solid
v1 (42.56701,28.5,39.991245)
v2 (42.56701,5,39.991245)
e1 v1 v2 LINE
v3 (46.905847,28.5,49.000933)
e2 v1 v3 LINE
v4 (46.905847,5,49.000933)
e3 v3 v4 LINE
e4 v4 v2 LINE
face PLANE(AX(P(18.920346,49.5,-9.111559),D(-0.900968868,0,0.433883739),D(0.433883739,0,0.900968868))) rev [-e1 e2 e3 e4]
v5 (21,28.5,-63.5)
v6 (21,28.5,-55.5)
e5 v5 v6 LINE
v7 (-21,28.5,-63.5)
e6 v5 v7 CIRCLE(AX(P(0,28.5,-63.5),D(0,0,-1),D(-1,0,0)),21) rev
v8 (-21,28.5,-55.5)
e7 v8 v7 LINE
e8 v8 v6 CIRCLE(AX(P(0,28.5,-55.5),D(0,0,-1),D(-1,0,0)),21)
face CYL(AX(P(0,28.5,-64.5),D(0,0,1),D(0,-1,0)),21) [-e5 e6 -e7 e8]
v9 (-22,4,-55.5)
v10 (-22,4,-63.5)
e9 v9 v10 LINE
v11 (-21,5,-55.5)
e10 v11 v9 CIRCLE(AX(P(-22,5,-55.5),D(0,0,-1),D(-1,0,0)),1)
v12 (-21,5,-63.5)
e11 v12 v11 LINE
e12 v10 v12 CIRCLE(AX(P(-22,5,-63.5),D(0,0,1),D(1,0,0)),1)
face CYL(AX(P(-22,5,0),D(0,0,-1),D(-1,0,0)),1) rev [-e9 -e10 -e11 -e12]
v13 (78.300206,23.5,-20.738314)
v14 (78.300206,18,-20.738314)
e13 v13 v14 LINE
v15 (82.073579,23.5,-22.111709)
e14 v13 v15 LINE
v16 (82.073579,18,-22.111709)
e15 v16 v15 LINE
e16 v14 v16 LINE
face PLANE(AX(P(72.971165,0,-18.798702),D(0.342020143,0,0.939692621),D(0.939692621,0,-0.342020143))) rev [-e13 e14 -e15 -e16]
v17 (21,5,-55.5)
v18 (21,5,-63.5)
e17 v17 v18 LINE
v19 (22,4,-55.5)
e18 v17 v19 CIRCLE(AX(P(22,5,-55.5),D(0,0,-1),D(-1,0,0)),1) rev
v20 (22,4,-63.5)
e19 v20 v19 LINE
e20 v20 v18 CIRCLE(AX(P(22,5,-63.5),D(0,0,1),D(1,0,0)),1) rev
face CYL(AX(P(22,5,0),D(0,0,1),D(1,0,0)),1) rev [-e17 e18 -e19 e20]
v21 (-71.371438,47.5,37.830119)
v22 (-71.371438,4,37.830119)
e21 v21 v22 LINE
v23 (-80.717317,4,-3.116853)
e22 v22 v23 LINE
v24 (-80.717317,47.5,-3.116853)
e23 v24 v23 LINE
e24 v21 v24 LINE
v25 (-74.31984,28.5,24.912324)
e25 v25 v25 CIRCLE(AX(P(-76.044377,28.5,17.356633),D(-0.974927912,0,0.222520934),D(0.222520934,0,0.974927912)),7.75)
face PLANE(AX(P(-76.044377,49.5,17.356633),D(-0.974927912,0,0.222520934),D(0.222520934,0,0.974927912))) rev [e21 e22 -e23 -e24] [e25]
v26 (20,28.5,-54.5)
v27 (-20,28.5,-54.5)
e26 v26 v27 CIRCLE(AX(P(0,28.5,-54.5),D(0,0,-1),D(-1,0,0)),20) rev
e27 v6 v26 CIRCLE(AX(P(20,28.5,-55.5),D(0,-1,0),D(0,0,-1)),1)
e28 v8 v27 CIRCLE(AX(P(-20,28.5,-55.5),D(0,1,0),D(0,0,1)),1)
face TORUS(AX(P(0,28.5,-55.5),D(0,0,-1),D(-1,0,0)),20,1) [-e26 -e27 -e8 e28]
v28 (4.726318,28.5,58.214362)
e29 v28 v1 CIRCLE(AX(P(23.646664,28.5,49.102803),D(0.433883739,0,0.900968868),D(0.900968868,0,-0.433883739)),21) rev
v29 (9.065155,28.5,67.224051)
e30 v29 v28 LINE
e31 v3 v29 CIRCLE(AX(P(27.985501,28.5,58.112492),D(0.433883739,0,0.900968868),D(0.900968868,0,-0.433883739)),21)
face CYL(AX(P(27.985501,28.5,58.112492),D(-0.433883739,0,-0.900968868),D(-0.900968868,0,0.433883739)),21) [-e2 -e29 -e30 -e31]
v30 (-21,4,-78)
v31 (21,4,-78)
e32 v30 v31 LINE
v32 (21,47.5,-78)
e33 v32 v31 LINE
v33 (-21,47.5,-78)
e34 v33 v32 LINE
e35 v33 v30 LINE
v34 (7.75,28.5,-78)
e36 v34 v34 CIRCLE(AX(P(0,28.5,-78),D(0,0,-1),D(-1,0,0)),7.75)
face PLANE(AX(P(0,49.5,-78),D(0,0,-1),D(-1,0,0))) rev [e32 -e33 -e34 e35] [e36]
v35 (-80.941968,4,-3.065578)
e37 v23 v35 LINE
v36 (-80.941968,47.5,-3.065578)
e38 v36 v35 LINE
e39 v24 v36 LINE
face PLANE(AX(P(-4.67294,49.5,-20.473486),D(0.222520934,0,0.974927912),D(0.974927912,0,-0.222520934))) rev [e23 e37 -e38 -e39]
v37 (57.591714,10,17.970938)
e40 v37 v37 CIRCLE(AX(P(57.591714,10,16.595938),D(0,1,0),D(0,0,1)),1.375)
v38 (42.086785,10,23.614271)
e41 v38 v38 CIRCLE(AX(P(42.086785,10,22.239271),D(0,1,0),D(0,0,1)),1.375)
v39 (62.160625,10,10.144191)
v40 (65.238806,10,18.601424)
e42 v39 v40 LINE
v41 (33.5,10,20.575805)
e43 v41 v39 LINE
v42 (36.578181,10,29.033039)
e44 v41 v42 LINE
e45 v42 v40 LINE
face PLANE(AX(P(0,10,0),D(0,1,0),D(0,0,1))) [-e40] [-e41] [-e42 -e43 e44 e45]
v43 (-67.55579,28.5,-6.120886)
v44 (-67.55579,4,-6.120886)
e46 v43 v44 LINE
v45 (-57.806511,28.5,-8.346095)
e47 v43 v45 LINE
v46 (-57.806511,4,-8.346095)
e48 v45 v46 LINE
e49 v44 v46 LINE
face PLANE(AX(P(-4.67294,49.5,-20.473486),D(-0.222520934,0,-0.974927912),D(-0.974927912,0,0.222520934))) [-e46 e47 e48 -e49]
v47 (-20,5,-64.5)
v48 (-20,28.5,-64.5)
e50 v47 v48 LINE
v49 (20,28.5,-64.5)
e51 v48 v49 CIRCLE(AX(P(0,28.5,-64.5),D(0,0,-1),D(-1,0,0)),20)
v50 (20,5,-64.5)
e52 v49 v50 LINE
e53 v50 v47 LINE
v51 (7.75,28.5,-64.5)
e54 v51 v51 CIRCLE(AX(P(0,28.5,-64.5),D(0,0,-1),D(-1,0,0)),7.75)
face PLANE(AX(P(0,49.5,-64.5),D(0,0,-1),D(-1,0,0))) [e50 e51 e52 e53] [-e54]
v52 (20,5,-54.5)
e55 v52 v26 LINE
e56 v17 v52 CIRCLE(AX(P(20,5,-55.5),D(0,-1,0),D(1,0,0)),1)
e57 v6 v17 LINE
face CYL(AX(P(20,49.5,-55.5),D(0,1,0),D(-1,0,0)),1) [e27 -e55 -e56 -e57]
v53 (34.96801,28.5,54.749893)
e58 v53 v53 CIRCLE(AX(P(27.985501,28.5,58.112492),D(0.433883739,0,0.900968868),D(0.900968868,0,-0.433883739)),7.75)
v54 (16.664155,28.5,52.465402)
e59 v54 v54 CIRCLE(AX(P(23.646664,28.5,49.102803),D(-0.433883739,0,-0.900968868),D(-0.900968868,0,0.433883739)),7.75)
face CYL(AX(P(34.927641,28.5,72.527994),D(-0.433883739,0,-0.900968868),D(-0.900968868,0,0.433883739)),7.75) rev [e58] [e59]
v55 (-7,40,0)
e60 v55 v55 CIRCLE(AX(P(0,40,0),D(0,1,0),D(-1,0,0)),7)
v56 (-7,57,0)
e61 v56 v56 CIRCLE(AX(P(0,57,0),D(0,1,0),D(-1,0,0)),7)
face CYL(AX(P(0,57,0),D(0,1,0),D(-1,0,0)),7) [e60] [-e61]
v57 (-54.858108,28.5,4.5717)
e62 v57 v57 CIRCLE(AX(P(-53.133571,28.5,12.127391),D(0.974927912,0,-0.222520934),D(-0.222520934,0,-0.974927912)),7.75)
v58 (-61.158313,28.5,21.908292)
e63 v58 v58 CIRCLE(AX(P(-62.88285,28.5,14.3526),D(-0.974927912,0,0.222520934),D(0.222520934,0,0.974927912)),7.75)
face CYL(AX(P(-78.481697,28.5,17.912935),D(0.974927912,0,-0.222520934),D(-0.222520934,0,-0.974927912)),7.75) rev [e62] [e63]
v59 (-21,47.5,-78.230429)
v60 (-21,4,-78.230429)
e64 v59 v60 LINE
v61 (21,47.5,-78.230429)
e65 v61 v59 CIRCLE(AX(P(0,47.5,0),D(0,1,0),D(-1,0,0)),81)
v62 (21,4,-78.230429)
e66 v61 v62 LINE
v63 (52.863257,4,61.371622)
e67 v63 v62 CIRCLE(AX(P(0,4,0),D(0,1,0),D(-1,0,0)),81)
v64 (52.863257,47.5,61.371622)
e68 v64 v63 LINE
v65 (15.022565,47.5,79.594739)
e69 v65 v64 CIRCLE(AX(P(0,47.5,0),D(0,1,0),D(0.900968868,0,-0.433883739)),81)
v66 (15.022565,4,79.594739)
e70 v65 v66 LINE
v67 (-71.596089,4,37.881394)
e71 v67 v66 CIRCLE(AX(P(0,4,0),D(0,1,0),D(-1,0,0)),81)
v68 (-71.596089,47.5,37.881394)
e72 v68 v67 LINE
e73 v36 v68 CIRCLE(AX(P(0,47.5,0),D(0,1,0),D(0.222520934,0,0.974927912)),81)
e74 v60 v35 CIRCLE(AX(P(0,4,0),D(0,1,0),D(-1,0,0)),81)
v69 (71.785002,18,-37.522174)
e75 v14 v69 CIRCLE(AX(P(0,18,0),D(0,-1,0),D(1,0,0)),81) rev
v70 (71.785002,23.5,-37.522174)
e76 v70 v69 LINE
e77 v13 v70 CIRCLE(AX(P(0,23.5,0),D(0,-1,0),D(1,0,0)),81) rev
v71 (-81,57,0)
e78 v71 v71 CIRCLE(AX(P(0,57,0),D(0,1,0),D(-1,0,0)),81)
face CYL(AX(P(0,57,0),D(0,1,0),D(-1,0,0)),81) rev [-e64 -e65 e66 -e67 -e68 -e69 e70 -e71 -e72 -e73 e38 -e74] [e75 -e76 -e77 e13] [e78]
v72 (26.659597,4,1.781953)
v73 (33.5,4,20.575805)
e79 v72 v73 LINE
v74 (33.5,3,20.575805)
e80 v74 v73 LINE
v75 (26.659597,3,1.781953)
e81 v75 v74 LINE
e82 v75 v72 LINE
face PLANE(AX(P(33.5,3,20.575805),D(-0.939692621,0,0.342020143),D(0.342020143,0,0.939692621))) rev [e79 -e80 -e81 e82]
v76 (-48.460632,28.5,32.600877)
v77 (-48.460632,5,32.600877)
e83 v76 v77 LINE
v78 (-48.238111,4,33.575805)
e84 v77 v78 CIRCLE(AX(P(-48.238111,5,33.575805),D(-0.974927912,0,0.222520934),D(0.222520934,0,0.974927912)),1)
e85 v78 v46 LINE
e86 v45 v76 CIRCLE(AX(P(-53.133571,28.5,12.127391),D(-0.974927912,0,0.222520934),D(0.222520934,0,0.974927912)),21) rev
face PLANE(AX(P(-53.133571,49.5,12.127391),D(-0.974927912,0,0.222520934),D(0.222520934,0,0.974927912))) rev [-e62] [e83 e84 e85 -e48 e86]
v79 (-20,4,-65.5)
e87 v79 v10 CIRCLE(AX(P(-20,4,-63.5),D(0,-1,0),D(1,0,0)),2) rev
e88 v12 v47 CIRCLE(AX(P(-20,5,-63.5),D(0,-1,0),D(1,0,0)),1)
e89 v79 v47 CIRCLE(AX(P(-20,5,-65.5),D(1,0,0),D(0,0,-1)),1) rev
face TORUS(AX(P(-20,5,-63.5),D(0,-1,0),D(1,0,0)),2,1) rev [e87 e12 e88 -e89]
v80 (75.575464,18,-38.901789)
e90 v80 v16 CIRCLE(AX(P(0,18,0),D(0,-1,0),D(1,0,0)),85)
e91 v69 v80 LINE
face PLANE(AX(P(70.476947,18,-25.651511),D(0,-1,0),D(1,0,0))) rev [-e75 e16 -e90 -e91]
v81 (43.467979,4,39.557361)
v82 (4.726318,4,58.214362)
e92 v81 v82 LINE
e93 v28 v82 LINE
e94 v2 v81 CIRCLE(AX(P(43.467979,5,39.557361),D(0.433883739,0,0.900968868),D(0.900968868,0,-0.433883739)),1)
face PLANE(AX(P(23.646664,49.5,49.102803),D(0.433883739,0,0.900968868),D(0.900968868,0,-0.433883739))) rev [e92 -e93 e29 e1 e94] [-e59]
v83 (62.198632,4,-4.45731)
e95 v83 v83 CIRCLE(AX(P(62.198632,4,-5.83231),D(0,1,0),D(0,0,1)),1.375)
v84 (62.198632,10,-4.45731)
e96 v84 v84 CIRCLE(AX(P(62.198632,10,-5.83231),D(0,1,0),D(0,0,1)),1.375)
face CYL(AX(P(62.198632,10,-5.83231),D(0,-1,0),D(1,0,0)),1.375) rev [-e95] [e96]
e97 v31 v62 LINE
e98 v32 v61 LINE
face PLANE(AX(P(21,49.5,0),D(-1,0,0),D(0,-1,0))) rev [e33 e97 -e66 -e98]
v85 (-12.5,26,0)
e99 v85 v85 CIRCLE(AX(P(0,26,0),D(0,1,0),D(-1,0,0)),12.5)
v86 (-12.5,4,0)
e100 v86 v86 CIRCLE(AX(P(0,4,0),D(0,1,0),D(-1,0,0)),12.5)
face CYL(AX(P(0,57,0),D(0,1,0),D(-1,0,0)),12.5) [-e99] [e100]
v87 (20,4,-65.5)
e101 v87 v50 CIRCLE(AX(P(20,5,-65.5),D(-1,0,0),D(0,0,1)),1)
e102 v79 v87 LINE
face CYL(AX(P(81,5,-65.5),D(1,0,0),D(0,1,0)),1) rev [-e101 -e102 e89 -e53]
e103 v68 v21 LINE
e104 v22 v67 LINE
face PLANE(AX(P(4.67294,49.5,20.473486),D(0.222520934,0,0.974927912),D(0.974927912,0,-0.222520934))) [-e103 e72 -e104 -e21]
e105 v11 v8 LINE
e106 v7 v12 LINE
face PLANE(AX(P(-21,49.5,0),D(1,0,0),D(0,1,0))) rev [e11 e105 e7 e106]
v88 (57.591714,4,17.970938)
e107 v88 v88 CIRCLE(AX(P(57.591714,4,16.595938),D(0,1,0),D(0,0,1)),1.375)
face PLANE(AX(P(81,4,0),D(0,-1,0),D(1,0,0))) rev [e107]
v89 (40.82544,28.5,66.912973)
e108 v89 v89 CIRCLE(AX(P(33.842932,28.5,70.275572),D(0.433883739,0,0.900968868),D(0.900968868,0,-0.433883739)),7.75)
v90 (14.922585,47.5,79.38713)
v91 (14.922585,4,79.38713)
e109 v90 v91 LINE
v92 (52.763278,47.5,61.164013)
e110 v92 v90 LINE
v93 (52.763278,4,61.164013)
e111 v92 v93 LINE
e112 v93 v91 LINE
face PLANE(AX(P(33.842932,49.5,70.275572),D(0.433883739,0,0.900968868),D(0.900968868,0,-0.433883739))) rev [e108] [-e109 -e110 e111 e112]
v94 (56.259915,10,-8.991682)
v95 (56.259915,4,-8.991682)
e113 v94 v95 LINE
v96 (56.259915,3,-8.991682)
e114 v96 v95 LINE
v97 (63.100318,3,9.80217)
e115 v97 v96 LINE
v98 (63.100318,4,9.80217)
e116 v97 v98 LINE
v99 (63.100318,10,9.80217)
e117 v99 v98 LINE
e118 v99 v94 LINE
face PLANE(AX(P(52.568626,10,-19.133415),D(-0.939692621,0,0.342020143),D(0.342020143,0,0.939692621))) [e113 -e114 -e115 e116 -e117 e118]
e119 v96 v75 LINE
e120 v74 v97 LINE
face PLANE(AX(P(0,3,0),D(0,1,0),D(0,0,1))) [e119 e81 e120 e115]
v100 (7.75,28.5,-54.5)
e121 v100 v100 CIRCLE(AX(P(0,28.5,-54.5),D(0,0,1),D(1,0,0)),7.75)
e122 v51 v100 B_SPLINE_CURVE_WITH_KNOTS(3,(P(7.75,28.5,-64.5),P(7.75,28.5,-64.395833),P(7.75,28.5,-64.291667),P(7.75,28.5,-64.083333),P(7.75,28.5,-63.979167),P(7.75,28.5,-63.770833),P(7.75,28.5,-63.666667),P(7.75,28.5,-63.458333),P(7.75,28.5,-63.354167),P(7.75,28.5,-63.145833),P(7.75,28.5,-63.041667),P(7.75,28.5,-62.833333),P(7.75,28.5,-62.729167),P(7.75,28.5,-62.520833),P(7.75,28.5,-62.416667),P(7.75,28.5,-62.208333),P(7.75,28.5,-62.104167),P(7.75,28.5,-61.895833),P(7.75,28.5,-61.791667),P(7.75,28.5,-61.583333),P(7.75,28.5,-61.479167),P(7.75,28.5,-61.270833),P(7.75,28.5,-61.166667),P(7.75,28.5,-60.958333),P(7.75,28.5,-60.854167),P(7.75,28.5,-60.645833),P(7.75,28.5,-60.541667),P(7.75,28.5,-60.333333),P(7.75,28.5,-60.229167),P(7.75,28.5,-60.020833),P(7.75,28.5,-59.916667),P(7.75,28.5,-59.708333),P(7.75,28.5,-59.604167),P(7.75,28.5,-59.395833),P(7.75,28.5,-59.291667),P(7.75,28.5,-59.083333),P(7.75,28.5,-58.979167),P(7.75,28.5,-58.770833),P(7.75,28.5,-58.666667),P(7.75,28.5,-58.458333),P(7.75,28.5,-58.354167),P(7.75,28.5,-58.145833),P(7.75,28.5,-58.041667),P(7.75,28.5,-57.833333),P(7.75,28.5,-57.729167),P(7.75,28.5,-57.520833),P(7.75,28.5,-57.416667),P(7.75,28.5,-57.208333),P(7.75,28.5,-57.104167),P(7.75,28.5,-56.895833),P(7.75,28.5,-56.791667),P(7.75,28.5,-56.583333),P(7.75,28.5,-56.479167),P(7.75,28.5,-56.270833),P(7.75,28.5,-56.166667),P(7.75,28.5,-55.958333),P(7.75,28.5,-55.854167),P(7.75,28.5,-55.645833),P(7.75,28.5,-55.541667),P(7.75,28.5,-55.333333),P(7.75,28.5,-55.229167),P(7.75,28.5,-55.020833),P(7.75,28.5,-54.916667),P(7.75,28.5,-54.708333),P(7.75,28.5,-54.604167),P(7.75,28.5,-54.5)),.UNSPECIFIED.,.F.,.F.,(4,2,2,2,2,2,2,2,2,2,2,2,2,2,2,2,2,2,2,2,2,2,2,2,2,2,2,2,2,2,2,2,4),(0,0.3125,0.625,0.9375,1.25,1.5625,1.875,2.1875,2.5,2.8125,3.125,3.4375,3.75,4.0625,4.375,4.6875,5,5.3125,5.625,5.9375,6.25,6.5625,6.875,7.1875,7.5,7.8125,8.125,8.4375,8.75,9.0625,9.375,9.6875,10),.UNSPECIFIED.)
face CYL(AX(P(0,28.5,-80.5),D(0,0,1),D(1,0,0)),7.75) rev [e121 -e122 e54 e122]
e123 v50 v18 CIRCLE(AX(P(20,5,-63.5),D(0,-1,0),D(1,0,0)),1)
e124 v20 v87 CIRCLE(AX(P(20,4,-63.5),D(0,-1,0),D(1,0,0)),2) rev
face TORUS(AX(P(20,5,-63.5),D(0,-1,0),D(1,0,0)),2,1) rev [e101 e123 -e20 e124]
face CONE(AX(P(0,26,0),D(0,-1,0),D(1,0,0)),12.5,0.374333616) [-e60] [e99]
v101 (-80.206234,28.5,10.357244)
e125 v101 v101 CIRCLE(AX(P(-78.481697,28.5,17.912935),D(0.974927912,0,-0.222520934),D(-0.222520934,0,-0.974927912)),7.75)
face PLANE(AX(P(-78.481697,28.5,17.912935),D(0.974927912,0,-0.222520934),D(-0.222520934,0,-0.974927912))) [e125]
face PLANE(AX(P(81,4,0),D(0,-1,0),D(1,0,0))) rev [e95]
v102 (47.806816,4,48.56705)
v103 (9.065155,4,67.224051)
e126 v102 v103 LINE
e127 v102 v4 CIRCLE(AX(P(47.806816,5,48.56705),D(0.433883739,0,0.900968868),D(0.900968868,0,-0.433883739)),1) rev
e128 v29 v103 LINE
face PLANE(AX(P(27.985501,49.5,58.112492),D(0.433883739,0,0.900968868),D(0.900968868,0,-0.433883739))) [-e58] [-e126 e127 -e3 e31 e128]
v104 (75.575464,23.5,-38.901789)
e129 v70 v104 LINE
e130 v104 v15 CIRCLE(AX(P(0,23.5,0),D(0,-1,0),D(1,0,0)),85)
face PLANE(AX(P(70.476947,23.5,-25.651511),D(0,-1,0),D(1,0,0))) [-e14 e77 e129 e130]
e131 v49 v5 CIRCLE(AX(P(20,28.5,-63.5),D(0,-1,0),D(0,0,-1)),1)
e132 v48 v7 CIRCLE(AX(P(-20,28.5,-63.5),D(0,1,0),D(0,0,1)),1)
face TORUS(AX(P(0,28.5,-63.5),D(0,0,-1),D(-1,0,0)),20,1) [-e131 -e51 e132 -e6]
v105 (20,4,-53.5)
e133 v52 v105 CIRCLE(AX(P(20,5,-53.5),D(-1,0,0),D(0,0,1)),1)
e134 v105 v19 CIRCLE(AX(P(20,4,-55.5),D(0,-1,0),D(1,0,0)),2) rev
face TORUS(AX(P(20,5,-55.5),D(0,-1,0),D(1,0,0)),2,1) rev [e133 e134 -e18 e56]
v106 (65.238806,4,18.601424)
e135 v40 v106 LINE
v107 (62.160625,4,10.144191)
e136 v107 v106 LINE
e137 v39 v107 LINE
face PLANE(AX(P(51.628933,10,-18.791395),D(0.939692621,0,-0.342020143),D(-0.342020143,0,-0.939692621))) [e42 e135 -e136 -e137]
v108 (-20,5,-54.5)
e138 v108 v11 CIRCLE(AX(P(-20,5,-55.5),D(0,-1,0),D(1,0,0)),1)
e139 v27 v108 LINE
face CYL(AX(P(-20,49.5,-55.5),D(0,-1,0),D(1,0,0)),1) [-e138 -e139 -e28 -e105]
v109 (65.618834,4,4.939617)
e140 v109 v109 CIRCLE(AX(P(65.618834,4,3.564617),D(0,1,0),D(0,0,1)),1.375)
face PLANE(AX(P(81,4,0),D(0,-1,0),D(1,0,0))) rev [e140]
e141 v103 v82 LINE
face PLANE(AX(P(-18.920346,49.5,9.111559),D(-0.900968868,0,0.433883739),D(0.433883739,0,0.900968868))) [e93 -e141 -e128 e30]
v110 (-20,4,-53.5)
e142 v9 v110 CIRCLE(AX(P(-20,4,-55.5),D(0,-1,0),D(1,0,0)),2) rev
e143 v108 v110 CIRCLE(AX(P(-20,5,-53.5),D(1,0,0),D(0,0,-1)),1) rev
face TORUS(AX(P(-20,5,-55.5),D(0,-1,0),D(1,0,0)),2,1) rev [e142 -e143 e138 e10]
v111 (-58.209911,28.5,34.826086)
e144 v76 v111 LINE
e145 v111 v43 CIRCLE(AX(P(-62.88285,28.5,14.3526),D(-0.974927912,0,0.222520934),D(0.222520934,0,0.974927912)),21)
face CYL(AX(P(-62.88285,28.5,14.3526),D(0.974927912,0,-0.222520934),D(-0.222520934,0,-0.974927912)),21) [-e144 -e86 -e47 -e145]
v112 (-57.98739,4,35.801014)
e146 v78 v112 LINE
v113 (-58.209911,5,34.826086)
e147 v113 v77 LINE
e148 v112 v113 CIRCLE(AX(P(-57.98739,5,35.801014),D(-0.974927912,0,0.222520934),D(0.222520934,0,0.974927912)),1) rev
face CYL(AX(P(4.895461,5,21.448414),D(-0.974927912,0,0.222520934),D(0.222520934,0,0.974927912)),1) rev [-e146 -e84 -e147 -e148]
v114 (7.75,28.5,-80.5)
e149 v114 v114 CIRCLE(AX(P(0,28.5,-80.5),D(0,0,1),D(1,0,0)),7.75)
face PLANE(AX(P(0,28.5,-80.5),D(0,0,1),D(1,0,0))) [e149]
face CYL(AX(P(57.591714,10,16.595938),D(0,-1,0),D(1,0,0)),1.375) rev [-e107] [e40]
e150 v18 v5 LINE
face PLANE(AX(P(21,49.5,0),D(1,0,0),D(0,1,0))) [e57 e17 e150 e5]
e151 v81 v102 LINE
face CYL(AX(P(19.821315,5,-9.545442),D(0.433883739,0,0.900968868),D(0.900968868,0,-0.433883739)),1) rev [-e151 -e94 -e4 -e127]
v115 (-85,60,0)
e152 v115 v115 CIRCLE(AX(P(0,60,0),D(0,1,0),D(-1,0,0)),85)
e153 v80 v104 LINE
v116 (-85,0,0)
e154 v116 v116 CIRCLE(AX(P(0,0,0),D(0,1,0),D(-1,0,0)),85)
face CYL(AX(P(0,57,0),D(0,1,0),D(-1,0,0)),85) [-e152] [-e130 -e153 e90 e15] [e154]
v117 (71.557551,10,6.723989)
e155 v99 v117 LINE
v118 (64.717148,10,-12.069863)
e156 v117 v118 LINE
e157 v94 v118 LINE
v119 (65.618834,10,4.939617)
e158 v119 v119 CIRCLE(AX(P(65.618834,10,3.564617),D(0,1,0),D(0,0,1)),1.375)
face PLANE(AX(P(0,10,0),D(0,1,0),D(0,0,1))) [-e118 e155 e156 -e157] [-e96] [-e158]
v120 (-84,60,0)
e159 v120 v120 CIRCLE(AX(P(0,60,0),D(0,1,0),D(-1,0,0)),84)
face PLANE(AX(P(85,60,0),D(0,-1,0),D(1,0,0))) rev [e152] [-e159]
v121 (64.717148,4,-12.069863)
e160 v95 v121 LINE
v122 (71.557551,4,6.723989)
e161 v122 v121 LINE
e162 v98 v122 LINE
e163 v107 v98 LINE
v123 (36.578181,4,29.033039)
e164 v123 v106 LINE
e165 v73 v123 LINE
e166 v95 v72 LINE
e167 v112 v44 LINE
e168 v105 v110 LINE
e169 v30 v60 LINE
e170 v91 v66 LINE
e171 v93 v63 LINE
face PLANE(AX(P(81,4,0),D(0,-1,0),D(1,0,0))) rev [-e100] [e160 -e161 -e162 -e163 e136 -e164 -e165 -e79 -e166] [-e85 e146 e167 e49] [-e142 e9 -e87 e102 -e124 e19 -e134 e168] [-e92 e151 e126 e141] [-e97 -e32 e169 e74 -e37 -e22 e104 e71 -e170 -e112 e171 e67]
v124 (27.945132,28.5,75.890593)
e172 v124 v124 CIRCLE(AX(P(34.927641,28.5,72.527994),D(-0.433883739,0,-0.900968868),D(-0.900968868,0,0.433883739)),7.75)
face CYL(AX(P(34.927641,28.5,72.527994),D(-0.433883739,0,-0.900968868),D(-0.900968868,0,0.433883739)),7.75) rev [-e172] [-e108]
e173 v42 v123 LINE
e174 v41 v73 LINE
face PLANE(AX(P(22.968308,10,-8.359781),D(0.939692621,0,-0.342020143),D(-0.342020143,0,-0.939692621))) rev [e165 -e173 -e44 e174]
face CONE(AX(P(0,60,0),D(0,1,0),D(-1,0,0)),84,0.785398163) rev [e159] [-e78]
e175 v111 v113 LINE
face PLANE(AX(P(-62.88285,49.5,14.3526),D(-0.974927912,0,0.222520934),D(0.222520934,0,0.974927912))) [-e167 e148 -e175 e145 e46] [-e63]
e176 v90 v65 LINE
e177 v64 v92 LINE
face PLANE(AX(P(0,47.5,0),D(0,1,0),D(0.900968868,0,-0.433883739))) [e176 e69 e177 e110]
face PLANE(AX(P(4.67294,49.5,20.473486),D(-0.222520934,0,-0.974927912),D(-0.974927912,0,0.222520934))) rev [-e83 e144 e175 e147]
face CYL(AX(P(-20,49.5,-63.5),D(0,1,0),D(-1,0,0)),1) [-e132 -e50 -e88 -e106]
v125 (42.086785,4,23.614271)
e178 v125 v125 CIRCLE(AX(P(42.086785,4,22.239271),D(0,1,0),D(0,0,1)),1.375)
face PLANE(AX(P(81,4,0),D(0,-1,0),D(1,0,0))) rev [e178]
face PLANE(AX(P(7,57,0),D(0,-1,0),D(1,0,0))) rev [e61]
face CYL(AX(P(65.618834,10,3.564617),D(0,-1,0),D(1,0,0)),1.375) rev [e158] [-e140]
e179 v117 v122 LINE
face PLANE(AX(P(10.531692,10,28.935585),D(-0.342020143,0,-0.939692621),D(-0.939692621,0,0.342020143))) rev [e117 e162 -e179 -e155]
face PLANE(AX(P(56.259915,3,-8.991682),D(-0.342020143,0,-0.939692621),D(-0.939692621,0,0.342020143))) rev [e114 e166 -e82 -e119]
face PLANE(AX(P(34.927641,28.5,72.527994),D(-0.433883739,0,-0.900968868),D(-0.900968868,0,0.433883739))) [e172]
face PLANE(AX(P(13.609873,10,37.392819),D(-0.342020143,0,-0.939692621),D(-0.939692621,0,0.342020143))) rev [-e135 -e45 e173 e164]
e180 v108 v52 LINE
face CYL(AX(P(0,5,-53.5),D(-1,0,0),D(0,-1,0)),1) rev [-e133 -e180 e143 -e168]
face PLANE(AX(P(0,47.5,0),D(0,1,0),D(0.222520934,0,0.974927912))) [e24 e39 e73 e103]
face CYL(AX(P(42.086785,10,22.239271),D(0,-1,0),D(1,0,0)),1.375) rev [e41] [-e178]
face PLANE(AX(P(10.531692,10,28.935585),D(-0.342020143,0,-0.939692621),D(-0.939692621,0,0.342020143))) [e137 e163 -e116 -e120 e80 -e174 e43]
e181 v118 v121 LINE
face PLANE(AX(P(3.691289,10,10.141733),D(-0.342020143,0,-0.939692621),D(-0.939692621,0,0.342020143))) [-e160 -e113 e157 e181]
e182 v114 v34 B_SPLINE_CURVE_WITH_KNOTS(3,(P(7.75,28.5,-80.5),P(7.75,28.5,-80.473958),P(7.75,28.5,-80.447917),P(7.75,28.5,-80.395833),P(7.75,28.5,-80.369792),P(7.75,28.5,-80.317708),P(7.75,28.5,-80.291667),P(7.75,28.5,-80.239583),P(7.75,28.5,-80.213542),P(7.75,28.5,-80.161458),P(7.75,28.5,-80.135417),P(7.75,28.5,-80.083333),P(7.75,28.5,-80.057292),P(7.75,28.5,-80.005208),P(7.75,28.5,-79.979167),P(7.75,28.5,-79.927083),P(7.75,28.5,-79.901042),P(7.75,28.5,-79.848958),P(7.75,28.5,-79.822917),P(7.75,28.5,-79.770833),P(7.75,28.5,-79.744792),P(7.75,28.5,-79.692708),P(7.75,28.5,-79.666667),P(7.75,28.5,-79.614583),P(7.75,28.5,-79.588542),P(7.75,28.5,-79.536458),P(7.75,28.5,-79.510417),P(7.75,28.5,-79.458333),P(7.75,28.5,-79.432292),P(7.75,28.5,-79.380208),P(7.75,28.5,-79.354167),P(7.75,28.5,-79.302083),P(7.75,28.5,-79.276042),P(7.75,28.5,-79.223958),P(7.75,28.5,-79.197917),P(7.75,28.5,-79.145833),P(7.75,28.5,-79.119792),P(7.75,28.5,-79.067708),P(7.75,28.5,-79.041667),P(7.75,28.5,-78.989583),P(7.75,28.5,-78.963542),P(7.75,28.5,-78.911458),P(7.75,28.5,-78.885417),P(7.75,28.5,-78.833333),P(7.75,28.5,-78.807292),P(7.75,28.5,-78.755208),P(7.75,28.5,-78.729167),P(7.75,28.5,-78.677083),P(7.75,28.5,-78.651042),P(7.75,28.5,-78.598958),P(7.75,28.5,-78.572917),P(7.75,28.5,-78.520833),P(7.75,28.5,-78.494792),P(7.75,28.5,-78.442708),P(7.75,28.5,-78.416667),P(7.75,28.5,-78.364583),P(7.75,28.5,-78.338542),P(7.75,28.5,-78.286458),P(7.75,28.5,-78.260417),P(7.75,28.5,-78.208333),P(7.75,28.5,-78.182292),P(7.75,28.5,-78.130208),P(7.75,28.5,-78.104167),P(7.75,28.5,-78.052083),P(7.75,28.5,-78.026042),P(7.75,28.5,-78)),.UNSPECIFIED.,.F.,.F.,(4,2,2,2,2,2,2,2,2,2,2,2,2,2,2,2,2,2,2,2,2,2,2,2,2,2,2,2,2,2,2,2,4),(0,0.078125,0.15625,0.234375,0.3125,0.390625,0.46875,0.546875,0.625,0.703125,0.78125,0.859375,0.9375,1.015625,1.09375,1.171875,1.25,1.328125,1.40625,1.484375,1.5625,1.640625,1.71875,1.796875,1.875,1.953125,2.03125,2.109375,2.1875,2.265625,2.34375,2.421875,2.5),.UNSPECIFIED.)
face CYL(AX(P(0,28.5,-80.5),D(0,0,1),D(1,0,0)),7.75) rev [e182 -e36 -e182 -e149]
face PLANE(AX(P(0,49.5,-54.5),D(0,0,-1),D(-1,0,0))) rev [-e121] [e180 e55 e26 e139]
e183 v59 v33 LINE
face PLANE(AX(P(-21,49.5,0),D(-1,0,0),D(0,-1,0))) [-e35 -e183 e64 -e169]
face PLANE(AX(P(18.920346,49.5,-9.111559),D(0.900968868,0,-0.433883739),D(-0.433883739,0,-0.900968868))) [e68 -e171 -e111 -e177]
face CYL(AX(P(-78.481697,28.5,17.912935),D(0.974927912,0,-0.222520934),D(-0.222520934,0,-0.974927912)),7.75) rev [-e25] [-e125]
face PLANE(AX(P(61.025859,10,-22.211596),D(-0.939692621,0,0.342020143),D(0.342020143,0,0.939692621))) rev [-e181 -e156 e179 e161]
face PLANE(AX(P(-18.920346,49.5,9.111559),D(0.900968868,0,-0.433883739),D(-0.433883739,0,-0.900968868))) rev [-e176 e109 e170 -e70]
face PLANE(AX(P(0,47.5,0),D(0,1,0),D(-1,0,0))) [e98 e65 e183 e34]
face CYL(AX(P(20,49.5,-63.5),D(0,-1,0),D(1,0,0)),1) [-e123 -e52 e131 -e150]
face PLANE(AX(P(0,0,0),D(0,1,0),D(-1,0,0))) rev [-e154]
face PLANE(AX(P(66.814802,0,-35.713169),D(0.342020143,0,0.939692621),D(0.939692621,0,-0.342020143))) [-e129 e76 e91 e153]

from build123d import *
from build123d.topology import SkipClean

# Parameters (mm, degrees)
SKETCH2_W               = 42
SKETCH2_H               = 10
BOSS_EXTRUDE1_DEPTH     = 45.5
FILLET1_RADIUS          = 21
FILLET1_LENGTH          = 10
SKETCH6_R               = 7.75
CUT_EXTRUDE2_DEPTH      = 26
FILLET2_R               = 1
CIRPATTERN4_START       = 54.5
CIRPATTERN4_OUTLINE_R   = 7.75
CIRPATTERN4_DEPTH       = 10
CIRPATTERN4_START_2     = 78
CIRPATTERN4_2_OUTLINE_W = 42
CIRPATTERN4_2_OUTLINE_H = 45.5
CIRPATTERN4_2_OUTLINE_R = 7.75
CIRPATTERN4_2_DEPTH     = 3
CIRPATTERN4_START_3     = 80.5
CIRPATTERN4_3_OUTLINE_R = 7.75
CIRPATTERN4_3_DEPTH     = 0.5
CIRPATTERN4_START_4     = -64.5
CIRPATTERN4_4_OUTLINE_R = 7.75
CIRPATTERN4_4_DEPTH     = 10
CIRPATTERN4_START_5     = -81.0000001
CIRPATTERN4_5_OUTLINE_W = 45.5
CIRPATTERN4_5_OUTLINE_H = 42
CIRPATTERN4_5_OUTLINE_R = 7.75
CIRPATTERN4_5_DEPTH     = 3.0000001
CIRPATTERN4_6_OUTLINE_R = 7.75
CIRPATTERN4_6_DEPTH     = 0.5000001
CUT_EXTRUDE3_START      = -2
CUT_EXTRUDE3_DEPTH      = 2
CIRPATTERN5_COUNT       = 7
SKETCH8_R               = 1.375
BOSS_EXTRUDE5_DEPTH     = 6
CUT_EXTRUDE4_DEPTH      = 1
SKETCH10_W              = 18
SKETCH10_H              = 5.5
CUT_EXTRUDE5_DEPTH      = 10


# Read off the part's stored shape, not the designer's step: CirPattern4
with BuildPart() as part:
    # Sketch1 → Revolve1 (revolve)
    with BuildSketch(Plane.XY, mode=Mode.PRIVATE) as revolve1_sk:
        Polygon((0, 0), (85, 0), (85, 60), (84, 60), (81, 57), (81, 4), (12.5, 4), (12.5, 26), (7, 40), (7, 57), (0, 57), align=None)
    revolve(revolve1_sk.sketch.rotate(Axis((0, 57, 0), (0, -1, 0)), 180), axis=Axis((0, 57, 0), (0, -1, 0)))

    # Sketch2 → Boss-Extrude1 (add)
    with BuildSketch(Plane(origin=(0, 4, 0), x_dir=(1, 0, 0), z_dir=(0, 1, 0))):
        with BuildLine():
            Line((-21, 78.230428862), (-21, 78))
            Line((-21, 78), (21, 78))
            Line((21, 78), (21, 78.230428862))
            ThreePointArc((21, 78.230428862), (0, 81), (-21, 78.230428862))
        make_face()
        with Locations((0, 59.5)):
            Rectangle(SKETCH2_W, SKETCH2_H)
    extrude(amount=BOSS_EXTRUDE1_DEPTH)

    # Fillet1: full round fillet: the end face becomes a half cylinder, R = half its width
    fillet1_face = Plane((0, 49.5, -59.5), x_dir=(0, 0, -1), z_dir=(0, 1, 0))  # on the end face: x along it, z out of the body
    fillet1_slab = fillet1_face.offset(-FILLET1_RADIUS / 2) * Box(FILLET1_LENGTH, 2 * FILLET1_RADIUS, FILLET1_RADIUS, mode=Mode.PRIVATE)  # the body's end, R deep
    fillet1_round = Plane((0, 28.5, -59.5), x_dir=(0, 1, 0), z_dir=(0, 0, -1)) * Cylinder(FILLET1_RADIUS, FILLET1_LENGTH, mode=Mode.PRIVATE)  # its axis R under the face
    add(fillet1_slab - fillet1_round, mode=Mode.SUBTRACT)

    # Sketch6 → Cut-Extrude2 (cut)
    with BuildSketch(Plane.XY.offset(-54.5)):
        with Locations((0, 28.5)):
            Circle(SKETCH6_R)
    extrude(amount=-CUT_EXTRUDE2_DEPTH, mode=Mode.SUBTRACT)

    # Fillet2
    fillet2_edges = [part.edges().sort_by_distance(p)[0] for p in [
        (-21, 4, -59.5),
        (0, 4, -54.5),
        (21, 4, -59.5),
        (0, 4, -64.5),
        (21, 16.25, -64.5),
        (21, 16.25, -54.5),
        (-21, 16.25, -54.5),
        (-21, 16.25, -64.5),
        (0, 49.5, -64.5),
        (0, 49.5, -54.5),
    ]]
    fillet(fillet2_edges, radius=FILLET2_R)

    # CirPattern4 outline → CirPattern4 (add)
    with BuildSketch(Plane(origin=(0, 0, 0), x_dir=(0.9009688679024158, 0, -0.433883739117565), z_dir=(0.43388373911756495, 0, 0.9009688679024159)).offset(CIRPATTERN4_START)):
        with BuildLine():
            Line((-21, 28.5), (-21, 4))
            Line((-21, 4), (22, 4))
            ThreePointArc((22, 4), (21.292893219, 4.292893219), (21, 5))
            Line((21, 5), (21, 28.5))
            ThreePointArc((21, 28.5), (0, 49.5), (-21, 28.5))
        make_face()
        with Locations((0, 28.5)):
            Circle(CIRPATTERN4_OUTLINE_R, mode=Mode.SUBTRACT)
    extrude(amount=CIRPATTERN4_DEPTH)

    # CirPattern4 2 outline → CirPattern4 2 (add)
    with BuildSketch(Plane(origin=(0, 0, 0), x_dir=(0.9009688679024158, 0, -0.433883739117565), z_dir=(0.43388373911756495, 0, 0.9009688679024159)).offset(CIRPATTERN4_START_2)):
        with Locations((0, 26.75)):
            Rectangle(CIRPATTERN4_2_OUTLINE_W, CIRPATTERN4_2_OUTLINE_H)
        with Locations((0, 28.5)):
            Circle(CIRPATTERN4_2_OUTLINE_R, mode=Mode.SUBTRACT)
    extrude(amount=CIRPATTERN4_2_DEPTH)

    # CirPattern4 3 outline → CirPattern4 3 (add)
    with BuildSketch(Plane(origin=(0, 0, 0), x_dir=(0.9009688679024158, 0, -0.433883739117565), z_dir=(0.43388373911756495, 0, 0.9009688679024159)).offset(CIRPATTERN4_START_3)):
        with Locations((0, 28.5)):
            Circle(CIRPATTERN4_3_OUTLINE_R)
    extrude(amount=CIRPATTERN4_3_DEPTH)

    # CirPattern4 4 outline → CirPattern4 4 (add)
    with BuildSketch(Plane(origin=(0, 0, 0), x_dir=(0, 1, 0), z_dir=(0.9749279121818228, 0, -0.22252093395631797)).offset(CIRPATTERN4_START_4)):
        with BuildLine():
            Line((4, -21), (28.5, -21))
            ThreePointArc((28.5, -21), (49.5, 0), (28.5, 21))
            Line((28.5, 21), (5, 21))
            ThreePointArc((5, 21), (4.292893219, 21.292893219), (4, 22))
            Line((4, 22), (4, -21))
        make_face()
        with Locations((28.5, 0)):
            Circle(CIRPATTERN4_4_OUTLINE_R, mode=Mode.SUBTRACT)
    extrude(amount=CIRPATTERN4_4_DEPTH)

    # CirPattern4 5 outline → CirPattern4 5 (add)
    with BuildSketch(Plane(origin=(0, 0, 0), x_dir=(0, 1, 0), z_dir=(0.9749279121818228, 0, -0.22252093395631797)).offset(CIRPATTERN4_START_5)):
        with Locations((26.75, 0)):
            Rectangle(CIRPATTERN4_5_OUTLINE_W, CIRPATTERN4_5_OUTLINE_H)
        with Locations((28.5, 0)):
            Circle(CIRPATTERN4_5_OUTLINE_R, mode=Mode.SUBTRACT)
    extrude(amount=CIRPATTERN4_5_DEPTH)

    # CirPattern4 6 outline → CirPattern4 6 (add)
    with BuildSketch(Plane(origin=(0, 0, 0), x_dir=(0, 1, 0), z_dir=(0.9749279121818228, 0, -0.22252093395631797)).offset(CIRPATTERN4_START_5)):
        with Locations((28.5, 0)):
            Circle(CIRPATTERN4_6_OUTLINE_R)
    extrude(amount=CIRPATTERN4_6_DEPTH)

    # Sketch7 → Cut-Extrude3 (cut)
    with SkipClean():  # the faces are left unmerged after this step: merging them gives an invalid solid
        with BuildSketch(Plane(origin=(0, 49.5, 0), x_dir=(1, 0, 0), z_dir=(0, 1, 0)).offset(CUT_EXTRUDE3_START)):
            with BuildLine():
                Line((-21, 78), (21, 78))
                Line((21, 78), (21, 78.230428862))
                ThreePointArc((21, 78.230428862), (0, 81), (-21, 78.230428862))
                Line((-21, 78.230428862), (-21, 78))
            make_face()
        cut_extrude3 = extrude(amount=CUT_EXTRUDE3_DEPTH, mode=Mode.SUBTRACT)

    # CirPattern5: Cut-Extrude3 ×7 about axis, 4 skipped
    with SkipClean():  # the faces are left unmerged after this step: merging them gives an invalid solid
        cirpattern5_axis = Axis((0, 0, 0), (0, 1, 0))
        add([cut_extrude3.rotate(cirpattern5_axis, i * 360 / CIRPATTERN5_COUNT) for i in range(1, CIRPATTERN5_COUNT) if i not in (1, 3, 5, 6)], mode=Mode.SUBTRACT)

    # Sketch8 → Boss-Extrude5 (add)
    # profile 1 of 2: a face of its own
    with SkipClean():  # the faces are left unmerged after this step: merging them gives an invalid solid
        with BuildSketch(Plane(origin=(0, 4, 0), x_dir=(1, 0, 0), z_dir=(0, 1, 0))):
            Polygon((62.160624934, -10.144190597), (33.5, -20.575804969), (36.57818129, -29.033038556), (65.238806224, -18.601424184), align=None)
            with Locations(Location((42.086785301, -22.239270687, 0), (0, 0, 270))):
                Circle(SKETCH8_R, mode=Mode.SUBTRACT)
            with Locations(Location((57.591713544, -16.595938322, 0), (0, 0, 270))):
                Circle(SKETCH8_R, mode=Mode.SUBTRACT)
        # profile 2 of 2: a face of its own
        with BuildSketch(Plane(origin=(0, 4, 0), x_dir=(1, 0, 0), z_dir=(0, 1, 0))):
            Polygon((63.100317555, -9.802170454), (71.557551142, -6.723989164), (64.717148275, 12.069863252), (56.259914688, 8.991681962), align=None)
            with Locations(Location((65.618833632, -3.564616705, 0), (0, 0, 270))):
                Circle(SKETCH8_R, mode=Mode.SUBTRACT)
            with Locations(Location((62.198632198, 5.832309503, 0), (0, 0, 270))):
                Circle(SKETCH8_R, mode=Mode.SUBTRACT)
        extrude(amount=BOSS_EXTRUDE5_DEPTH)

    # Sketch9 → Cut-Extrude4 (cut)
    with SkipClean():  # the faces are left unmerged after this step: merging them gives an invalid solid
        with BuildSketch(Plane(origin=(0, 4, 0), x_dir=(1, 0, 0), z_dir=(0, 1, 0))):
            Polygon((63.100317555, -9.802170454), (33.5, -20.575804969), (26.659597133, -1.781952553), (56.259914688, 8.991681962), align=None)
        extrude(amount=-CUT_EXTRUDE4_DEPTH, mode=Mode.SUBTRACT)

    # Sketch10 → Cut-Extrude5 (cut)
    with SkipClean():  # the faces are left unmerged after this step: merging them gives an invalid solid
        with BuildSketch(Plane(origin=(79.873872767, 0, -29.071712183), x_dir=(-0.3420201433256727, 0, -0.939692620785907), z_dir=(0.939692620785907, 0, -0.3420201433256727))):
            with Locations((1.707393103, 20.75)):
                Rectangle(SKETCH10_W, SKETCH10_H)
        extrude(amount=-CUT_EXTRUDE5_DEPTH, mode=Mode.SUBTRACT)


solid = part.part
